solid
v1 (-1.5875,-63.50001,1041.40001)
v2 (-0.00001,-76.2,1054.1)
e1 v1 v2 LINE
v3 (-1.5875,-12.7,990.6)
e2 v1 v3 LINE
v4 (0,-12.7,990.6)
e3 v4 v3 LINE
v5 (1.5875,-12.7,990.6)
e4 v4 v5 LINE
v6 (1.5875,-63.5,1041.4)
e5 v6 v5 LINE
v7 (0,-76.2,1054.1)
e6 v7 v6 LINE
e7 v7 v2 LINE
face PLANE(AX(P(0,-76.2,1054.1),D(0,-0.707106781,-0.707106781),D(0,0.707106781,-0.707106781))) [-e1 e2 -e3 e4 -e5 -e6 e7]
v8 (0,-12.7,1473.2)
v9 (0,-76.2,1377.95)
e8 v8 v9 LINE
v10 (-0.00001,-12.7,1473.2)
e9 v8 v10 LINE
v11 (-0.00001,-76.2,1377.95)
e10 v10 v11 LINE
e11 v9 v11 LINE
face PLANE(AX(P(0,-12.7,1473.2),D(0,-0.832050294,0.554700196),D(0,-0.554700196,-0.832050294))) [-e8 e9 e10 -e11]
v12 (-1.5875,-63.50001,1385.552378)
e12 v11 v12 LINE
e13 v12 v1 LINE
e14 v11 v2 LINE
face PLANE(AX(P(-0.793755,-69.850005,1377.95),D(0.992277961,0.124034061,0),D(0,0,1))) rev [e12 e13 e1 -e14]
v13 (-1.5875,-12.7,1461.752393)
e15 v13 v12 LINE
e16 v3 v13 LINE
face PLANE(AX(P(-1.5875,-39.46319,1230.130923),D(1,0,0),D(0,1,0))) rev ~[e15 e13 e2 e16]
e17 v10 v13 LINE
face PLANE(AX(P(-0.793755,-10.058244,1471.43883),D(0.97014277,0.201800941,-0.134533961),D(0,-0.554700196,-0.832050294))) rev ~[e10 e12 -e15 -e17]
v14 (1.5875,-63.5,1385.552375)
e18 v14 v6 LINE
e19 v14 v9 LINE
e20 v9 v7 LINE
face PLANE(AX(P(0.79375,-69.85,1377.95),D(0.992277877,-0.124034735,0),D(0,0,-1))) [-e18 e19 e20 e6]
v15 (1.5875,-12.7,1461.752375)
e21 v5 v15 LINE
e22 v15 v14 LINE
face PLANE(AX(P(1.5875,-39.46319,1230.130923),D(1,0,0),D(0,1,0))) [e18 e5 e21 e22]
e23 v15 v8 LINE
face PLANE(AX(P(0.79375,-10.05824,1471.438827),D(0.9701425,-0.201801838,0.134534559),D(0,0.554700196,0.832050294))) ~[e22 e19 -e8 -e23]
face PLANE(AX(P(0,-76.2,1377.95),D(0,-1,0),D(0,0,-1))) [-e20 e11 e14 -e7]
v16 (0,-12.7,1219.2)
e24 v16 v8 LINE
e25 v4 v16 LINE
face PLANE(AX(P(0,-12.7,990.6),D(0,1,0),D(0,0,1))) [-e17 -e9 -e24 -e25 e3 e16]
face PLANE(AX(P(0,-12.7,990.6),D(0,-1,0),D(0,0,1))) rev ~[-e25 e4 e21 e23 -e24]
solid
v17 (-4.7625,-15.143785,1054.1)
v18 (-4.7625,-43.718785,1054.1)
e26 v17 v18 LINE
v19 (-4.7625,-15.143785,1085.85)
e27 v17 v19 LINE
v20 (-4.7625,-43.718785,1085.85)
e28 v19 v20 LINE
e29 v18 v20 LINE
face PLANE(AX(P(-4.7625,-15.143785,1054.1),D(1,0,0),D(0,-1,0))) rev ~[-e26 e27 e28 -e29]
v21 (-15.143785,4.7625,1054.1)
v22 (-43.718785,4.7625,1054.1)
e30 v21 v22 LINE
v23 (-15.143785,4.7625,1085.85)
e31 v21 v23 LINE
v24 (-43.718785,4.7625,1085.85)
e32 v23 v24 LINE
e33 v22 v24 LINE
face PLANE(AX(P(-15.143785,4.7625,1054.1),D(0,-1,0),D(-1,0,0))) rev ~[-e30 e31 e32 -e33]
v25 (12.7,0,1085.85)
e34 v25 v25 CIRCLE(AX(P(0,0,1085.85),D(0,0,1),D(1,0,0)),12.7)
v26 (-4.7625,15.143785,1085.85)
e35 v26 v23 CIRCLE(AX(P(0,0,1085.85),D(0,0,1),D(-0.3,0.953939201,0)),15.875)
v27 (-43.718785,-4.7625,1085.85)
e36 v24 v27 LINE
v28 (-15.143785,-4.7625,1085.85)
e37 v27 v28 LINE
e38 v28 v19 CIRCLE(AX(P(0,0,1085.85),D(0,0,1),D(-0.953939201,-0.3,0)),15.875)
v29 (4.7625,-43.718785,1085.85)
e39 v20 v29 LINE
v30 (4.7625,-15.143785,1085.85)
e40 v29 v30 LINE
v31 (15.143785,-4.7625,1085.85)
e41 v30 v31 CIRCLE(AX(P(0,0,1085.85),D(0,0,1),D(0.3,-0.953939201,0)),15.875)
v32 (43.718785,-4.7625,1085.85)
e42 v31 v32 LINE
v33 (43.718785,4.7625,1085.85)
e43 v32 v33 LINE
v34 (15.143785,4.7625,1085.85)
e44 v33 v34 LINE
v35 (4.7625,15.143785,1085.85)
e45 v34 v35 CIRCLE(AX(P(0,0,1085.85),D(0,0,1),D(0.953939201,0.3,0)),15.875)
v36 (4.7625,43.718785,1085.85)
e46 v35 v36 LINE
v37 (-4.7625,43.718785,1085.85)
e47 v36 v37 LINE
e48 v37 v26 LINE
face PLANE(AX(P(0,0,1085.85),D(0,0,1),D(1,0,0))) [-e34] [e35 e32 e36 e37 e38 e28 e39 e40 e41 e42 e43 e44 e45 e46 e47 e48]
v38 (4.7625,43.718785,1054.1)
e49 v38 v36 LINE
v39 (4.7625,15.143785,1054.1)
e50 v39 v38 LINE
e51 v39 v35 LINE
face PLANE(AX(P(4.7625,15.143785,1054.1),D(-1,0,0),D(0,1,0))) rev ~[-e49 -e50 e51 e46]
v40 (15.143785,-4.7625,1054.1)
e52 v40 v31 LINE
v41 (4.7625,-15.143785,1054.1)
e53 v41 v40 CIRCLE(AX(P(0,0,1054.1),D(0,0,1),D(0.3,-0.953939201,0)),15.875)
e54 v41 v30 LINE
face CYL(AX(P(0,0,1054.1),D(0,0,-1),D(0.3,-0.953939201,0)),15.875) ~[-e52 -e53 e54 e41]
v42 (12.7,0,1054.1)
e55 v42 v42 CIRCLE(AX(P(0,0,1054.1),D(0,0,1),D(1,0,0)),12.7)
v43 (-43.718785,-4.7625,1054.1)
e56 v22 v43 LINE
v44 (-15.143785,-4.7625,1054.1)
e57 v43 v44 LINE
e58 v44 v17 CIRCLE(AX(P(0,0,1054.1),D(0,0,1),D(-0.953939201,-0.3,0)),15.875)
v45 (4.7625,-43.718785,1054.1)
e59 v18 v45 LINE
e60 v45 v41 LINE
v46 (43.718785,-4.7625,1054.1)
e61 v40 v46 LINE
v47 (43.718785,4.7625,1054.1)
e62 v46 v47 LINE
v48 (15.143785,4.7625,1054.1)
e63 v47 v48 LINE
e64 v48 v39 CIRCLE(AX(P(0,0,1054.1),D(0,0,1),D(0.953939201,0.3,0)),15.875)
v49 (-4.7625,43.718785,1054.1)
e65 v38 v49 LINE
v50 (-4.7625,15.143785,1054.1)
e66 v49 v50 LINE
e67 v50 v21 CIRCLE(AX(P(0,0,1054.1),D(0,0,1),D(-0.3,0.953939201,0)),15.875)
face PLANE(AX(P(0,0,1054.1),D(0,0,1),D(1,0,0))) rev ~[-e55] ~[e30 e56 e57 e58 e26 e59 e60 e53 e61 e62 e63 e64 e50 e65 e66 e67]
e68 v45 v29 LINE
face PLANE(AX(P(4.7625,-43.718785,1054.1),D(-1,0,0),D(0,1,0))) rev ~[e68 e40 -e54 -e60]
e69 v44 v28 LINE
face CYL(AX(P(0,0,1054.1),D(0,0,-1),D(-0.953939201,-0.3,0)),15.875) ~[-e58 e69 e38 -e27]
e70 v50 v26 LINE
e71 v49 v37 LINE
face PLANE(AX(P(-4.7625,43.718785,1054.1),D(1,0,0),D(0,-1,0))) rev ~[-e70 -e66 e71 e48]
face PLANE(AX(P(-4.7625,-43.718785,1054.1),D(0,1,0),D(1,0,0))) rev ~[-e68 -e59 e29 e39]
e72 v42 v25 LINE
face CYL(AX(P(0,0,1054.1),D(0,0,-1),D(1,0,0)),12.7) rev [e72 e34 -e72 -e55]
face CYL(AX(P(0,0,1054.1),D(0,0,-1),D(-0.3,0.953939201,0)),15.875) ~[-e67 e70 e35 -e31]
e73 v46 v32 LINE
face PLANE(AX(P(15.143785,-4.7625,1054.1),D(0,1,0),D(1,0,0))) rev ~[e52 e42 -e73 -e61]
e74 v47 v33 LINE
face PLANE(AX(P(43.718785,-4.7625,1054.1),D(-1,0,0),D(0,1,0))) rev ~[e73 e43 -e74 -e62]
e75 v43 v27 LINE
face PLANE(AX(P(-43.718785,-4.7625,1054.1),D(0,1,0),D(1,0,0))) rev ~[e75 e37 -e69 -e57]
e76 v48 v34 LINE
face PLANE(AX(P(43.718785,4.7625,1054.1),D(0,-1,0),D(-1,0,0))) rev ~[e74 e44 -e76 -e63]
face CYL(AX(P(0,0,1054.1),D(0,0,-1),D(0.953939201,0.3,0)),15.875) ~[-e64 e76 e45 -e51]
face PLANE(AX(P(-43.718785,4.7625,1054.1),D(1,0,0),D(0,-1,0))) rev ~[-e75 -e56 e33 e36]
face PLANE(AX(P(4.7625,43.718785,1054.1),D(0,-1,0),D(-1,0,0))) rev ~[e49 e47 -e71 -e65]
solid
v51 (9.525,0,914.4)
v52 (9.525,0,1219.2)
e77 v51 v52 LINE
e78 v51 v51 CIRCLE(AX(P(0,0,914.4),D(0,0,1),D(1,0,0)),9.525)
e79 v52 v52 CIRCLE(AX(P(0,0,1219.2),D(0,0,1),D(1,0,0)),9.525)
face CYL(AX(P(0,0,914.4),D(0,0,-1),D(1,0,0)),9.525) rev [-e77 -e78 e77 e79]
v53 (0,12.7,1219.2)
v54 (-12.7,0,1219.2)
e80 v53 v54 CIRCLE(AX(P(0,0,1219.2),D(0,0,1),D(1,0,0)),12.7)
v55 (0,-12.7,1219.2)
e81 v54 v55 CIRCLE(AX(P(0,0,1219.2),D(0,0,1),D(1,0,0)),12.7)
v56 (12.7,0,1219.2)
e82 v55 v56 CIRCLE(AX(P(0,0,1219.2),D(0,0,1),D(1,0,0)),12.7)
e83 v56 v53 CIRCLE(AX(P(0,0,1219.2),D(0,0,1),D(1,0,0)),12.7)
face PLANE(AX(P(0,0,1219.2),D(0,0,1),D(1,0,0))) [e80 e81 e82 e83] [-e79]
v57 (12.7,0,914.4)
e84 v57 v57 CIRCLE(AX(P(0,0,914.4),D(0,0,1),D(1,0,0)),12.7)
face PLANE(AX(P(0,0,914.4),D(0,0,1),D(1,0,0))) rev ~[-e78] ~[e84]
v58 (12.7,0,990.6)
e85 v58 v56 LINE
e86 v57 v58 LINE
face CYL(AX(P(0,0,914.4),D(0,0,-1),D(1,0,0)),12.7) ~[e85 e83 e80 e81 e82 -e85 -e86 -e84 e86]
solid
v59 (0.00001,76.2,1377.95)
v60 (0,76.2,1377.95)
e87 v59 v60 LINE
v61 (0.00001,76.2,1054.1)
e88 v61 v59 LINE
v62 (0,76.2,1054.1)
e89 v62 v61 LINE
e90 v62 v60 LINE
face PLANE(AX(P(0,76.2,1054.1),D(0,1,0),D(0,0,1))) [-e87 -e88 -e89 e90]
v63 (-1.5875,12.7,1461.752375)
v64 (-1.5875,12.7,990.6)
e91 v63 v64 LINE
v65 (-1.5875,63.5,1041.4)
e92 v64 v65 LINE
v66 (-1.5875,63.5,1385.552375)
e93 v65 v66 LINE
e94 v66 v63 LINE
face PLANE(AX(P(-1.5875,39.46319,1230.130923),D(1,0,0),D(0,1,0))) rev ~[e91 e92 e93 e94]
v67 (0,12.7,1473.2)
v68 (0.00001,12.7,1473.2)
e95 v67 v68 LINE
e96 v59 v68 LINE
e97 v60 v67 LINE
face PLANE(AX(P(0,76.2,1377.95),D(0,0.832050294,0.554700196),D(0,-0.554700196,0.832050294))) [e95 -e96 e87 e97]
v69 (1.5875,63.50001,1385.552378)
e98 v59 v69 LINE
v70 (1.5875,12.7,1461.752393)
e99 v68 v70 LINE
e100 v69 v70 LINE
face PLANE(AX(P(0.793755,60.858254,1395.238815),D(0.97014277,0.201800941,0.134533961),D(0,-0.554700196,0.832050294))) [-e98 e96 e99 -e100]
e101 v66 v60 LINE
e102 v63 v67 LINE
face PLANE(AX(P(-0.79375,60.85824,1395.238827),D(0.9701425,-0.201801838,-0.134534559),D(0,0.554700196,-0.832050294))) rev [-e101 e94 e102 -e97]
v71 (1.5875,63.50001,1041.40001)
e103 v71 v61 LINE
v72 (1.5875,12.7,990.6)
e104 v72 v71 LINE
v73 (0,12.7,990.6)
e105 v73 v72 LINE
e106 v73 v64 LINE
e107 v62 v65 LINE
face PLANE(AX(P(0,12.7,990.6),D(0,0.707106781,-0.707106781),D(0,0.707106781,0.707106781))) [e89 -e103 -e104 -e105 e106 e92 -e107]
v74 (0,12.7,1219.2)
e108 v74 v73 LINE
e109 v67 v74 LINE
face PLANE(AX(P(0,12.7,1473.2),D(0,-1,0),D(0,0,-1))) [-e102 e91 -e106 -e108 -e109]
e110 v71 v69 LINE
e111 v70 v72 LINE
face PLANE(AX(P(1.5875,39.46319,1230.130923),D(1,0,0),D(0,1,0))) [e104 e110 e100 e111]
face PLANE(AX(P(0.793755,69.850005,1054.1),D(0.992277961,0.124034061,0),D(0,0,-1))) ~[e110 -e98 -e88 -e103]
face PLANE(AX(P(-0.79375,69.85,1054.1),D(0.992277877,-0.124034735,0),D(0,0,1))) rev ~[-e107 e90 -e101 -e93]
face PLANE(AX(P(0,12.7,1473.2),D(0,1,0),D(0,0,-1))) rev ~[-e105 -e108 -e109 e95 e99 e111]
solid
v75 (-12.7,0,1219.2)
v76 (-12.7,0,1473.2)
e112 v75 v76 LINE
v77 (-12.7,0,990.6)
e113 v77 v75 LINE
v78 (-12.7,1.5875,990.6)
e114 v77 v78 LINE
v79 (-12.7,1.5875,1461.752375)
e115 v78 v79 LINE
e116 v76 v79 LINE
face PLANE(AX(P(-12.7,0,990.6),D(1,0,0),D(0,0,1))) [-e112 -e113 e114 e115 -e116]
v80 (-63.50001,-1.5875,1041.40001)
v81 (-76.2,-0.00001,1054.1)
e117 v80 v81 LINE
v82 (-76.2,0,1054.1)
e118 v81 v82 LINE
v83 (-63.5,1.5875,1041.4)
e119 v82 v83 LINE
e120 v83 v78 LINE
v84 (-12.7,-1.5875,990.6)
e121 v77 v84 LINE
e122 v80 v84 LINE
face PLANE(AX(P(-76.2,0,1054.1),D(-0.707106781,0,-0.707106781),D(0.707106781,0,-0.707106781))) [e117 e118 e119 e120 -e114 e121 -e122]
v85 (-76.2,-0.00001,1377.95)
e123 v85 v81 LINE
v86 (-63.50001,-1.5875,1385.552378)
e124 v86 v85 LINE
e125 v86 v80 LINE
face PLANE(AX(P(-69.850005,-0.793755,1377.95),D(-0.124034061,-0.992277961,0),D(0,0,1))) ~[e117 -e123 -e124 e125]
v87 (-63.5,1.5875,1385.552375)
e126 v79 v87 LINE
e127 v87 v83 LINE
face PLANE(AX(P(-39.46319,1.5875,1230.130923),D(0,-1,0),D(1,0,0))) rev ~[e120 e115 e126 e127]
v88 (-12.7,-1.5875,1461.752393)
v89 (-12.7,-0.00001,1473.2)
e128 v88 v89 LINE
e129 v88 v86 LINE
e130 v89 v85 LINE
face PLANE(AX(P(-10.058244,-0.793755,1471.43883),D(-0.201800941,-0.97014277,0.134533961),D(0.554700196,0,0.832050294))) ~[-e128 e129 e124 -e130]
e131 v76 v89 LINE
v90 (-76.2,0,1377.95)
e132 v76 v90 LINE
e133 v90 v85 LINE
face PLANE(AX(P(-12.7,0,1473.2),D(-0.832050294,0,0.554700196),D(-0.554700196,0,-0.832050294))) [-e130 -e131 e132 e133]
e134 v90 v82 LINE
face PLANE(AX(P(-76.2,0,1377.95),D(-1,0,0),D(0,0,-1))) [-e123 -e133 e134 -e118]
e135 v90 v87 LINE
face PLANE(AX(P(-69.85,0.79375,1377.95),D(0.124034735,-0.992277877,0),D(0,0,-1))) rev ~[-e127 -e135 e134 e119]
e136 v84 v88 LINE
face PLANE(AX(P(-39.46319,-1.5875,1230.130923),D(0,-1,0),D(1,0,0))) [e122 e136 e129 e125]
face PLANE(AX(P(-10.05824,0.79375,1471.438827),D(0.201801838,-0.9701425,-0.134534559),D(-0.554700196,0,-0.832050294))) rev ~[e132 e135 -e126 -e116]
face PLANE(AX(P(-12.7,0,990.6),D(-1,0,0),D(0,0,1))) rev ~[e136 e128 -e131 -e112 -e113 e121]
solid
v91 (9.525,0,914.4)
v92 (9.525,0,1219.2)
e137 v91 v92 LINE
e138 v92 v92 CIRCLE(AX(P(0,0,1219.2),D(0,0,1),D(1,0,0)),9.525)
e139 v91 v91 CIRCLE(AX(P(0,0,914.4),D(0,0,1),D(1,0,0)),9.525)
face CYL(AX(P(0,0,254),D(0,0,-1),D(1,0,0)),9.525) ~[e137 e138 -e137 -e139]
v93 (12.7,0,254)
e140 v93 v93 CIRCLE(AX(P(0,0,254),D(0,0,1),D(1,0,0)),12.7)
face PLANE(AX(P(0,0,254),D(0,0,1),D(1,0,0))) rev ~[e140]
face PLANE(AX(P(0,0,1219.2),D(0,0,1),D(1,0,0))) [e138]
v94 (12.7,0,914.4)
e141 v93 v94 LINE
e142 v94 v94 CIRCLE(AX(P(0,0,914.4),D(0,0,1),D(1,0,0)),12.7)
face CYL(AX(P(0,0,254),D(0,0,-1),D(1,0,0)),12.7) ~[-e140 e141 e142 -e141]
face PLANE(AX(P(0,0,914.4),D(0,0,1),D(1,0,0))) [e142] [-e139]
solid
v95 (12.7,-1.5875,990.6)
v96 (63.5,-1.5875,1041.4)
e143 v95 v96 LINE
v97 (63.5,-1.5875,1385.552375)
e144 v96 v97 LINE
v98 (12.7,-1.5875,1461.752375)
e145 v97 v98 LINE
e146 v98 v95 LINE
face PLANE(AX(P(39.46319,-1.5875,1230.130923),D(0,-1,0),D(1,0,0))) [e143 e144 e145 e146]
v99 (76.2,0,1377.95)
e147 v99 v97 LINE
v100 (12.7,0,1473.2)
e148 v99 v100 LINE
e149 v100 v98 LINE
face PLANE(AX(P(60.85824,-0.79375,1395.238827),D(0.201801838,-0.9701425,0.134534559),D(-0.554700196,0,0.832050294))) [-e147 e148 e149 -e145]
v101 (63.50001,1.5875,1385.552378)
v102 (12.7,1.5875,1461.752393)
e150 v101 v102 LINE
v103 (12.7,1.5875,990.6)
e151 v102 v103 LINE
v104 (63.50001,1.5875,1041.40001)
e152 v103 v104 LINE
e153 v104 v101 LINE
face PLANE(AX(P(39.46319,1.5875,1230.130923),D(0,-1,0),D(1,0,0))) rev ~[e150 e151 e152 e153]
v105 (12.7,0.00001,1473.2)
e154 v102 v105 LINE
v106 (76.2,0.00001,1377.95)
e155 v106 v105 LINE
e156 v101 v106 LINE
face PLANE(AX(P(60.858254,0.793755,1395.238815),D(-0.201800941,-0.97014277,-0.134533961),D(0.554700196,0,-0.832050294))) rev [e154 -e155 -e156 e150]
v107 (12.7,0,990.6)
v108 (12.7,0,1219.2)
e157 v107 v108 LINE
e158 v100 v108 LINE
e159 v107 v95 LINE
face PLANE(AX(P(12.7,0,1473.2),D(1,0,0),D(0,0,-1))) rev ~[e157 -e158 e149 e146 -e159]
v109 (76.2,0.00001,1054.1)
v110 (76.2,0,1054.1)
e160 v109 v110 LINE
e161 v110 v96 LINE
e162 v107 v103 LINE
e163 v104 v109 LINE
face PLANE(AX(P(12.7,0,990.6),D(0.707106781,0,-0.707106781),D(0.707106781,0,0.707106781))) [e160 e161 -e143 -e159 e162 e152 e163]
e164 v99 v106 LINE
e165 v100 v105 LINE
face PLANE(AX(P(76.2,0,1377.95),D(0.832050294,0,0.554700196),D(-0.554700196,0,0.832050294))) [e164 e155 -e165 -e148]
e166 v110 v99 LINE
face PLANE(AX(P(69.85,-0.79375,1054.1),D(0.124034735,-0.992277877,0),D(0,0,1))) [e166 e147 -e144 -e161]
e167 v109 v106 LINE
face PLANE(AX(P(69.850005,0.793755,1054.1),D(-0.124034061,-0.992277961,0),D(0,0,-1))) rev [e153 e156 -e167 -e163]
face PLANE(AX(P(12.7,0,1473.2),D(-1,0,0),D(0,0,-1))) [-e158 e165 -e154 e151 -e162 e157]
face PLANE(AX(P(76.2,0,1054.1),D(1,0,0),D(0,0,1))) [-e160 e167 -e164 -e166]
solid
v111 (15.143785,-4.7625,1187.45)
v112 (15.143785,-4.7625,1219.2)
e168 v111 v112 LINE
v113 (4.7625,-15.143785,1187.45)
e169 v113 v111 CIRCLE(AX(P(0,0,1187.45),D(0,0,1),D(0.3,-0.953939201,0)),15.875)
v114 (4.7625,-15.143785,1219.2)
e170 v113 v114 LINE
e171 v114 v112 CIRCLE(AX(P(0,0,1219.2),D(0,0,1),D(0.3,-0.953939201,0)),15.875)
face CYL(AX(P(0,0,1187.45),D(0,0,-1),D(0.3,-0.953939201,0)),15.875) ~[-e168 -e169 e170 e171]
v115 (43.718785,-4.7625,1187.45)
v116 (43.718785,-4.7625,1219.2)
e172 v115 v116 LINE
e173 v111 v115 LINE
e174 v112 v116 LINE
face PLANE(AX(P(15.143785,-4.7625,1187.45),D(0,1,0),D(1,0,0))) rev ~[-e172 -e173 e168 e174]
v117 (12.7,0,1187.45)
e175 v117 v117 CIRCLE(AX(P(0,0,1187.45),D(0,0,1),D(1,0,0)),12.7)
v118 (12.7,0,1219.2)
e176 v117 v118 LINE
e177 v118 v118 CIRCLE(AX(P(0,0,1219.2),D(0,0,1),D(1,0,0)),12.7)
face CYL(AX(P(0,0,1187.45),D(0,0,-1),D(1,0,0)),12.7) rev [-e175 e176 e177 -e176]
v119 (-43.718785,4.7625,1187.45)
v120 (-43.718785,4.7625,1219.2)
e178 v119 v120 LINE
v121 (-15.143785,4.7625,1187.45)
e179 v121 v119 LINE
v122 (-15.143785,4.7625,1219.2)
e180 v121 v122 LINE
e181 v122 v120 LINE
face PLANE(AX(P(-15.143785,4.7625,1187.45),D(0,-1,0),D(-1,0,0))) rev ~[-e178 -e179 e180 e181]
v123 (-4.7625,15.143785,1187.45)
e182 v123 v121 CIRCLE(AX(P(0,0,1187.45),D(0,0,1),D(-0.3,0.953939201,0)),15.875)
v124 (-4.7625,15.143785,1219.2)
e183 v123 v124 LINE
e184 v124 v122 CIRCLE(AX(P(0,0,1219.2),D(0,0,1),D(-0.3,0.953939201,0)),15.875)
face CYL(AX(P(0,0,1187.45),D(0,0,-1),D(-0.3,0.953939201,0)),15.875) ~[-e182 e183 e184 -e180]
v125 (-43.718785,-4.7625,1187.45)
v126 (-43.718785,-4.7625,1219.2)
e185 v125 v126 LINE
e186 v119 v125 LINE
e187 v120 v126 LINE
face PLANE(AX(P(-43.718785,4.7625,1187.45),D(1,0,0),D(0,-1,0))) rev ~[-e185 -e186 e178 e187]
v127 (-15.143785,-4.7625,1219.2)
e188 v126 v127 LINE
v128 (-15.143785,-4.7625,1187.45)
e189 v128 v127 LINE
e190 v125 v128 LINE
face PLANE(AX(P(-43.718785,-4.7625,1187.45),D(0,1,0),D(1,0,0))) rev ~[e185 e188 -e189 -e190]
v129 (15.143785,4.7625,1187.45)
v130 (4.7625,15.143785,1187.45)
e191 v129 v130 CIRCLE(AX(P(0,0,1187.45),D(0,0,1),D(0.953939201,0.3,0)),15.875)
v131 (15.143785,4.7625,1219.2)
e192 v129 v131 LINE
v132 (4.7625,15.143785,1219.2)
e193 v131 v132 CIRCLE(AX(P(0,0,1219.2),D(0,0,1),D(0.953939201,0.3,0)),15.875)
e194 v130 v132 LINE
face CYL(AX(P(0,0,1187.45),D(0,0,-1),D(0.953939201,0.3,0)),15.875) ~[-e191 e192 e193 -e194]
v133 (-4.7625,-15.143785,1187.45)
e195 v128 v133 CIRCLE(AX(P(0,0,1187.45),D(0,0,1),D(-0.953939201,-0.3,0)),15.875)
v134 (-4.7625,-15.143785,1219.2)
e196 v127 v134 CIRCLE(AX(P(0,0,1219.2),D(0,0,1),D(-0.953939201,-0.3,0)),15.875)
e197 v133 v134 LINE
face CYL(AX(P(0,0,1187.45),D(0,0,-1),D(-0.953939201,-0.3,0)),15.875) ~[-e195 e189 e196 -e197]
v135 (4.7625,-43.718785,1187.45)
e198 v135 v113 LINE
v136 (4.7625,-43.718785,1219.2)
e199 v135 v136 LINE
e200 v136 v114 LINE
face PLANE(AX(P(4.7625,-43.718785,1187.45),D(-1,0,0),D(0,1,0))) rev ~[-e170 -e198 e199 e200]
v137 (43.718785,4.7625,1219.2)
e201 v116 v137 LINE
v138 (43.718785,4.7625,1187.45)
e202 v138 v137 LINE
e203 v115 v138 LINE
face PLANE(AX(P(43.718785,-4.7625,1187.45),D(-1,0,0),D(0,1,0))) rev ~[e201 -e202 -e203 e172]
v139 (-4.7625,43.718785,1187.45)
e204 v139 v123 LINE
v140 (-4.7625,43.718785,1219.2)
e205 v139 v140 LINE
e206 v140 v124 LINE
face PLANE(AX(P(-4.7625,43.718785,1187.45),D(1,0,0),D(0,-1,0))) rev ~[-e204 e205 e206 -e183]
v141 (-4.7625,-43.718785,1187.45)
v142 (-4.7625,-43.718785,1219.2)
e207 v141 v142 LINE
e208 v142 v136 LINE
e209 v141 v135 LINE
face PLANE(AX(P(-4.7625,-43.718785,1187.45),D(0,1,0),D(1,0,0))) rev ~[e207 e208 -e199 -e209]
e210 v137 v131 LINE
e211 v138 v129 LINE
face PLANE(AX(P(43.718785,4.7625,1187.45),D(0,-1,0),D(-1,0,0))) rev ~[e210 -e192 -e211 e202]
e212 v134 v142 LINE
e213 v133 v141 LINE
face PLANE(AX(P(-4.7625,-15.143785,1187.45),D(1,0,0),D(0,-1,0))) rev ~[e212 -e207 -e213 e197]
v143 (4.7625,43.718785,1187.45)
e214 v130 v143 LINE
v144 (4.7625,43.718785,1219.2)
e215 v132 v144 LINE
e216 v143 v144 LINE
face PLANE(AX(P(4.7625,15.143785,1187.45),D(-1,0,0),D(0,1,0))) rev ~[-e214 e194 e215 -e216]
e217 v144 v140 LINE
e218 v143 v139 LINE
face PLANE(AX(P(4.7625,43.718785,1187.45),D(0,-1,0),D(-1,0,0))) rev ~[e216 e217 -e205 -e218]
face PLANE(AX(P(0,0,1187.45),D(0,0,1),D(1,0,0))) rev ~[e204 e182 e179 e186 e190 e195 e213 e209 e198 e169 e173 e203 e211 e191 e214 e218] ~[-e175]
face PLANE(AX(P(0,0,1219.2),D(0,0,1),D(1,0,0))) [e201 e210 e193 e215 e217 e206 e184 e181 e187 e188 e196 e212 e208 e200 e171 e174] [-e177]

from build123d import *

# Parameters (mm, degrees)
F1_START      = 254
F0_R          = 12.7
F0_R_2        = 9.525
F1_DEPTH      = 660.4
F2_START      = 254
F2_DEPTH      = 965.2
F3_START      = 914.4
F3_DEPTH      = 304.8
F5_DEPTH      = 1.5875
F5_DEPTH_BACK = 1.5875
F7_DEPTH      = 1.5875
F7_DEPTH_BACK = 1.5875
F9_START      = 1054.1
F8_R          = 12.7
F9_DEPTH      = 31.75
F10_START     = 1187.45
F10_DEPTH     = 31.75
F11_SIZE2     = 12.7
F11_SIZE      = 1.5875
F11_2_SIZE2   = 12.7
F11_2_SIZE    = 1.5875
F11_3_SIZE2   = 12.7
F11_3_SIZE    = 1.5875
F11_4_SIZE2   = 12.7
F11_4_SIZE    = 1.5875
F12_SIZE2     = 1.58749
F12_SIZE      = 12.69999
F12_2_SIZE2   = 1.58749
F12_2_SIZE    = 12.69999
F12_3_SIZE2   = 1.58749
F12_3_SIZE    = 12.69999
F12_4_SIZE2   = 1.58749
F12_4_SIZE    = 12.69999
F13_SIZE2     = 1.58749
F13_SIZE      = 6.34999
F13_2_SIZE2   = 1.5875
F13_2_SIZE    = 6.35
F13_3_SIZE2   = 1.58749
F13_3_SIZE    = 6.34999
F13_4_SIZE2   = 1.5875
F13_4_SIZE    = 6.35
F14_SIZE2     = 6.35
F14_SIZE      = 1.5875
F14_2_SIZE2   = 6.34999
F14_2_SIZE    = 1.58749
F14_3_SIZE2   = 6.35
F14_3_SIZE    = 1.5875
F14_4_SIZE2   = 6.34999
F14_4_SIZE    = 1.58749


# Not quite as in the source:
# - a fillet or chamfer is up to 0.001 mm smaller than in the source, because OpenCascade refuses the exact size


with BuildPart() as f1:
    # F0 (on Top) → F1 (new body)
    with BuildSketch(Plane.XY.offset(F1_START)):
        Circle(F0_R)
        Circle(F0_R_2, mode=Mode.SUBTRACT)
    extrude(amount=F1_DEPTH)

    # F0 (on Top) → F2 (join)
    with BuildSketch(Plane.XY.offset(F2_START)):
        Circle(F0_R_2)
    extrude(amount=F2_DEPTH)


with BuildPart() as f3:
    # F0 (on Top) → F3 (new body)
    with BuildSketch(Plane.XY.offset(F3_START)):
        Circle(F0_R)
        Circle(F0_R_2, mode=Mode.SUBTRACT)
    extrude(amount=F3_DEPTH)

    # F4 (on Front) → F5 (join, two sides)
    with BuildSketch(Plane.XZ) as f5_sk:
        Polygon((-12.7, 990.6), (-12.7, 1473.2), (-76.2, 1377.95), (-76.2, 1054.1), align=None)
        Polygon((76.2, 1377.95), (12.7, 1473.2), (12.7, 990.6), (76.2, 1054.1), align=None)
    extrude(amount=F5_DEPTH)
    extrude(f5_sk.sketch, amount=-F5_DEPTH_BACK)

    # F6 (on Right) → F7 (join, two sides)
    with BuildSketch(Plane.YZ) as f7_sk:
        Polygon((-76.2, 1054.1), (-12.7, 990.6), (-12.7, 1473.2), (-76.2, 1377.95), align=None)
        Polygon((12.7, 1473.2), (12.7, 990.6), (76.2, 1054.1), (76.2, 1377.95), align=None)
    extrude(amount=F7_DEPTH)
    extrude(f7_sk.sketch, amount=-F7_DEPTH_BACK)

    # F11
    f11_edges = [f3.edges().sort_by_distance(p)[0] for p in [
        (76.2, -1.5875, 1216.025),
    ]]
    f11_side = f3.faces().sort_by_distance((76.2, 0, 1216.025))[0]
    chamfer(f11_edges, length=F11_SIZE, length2=F11_SIZE2, reference=f11_side)

    # F11#2
    f11_2_edges = [f3.edges().sort_by_distance(p)[0] for p in [
        (1.5875, -76.2, 1216.025),
    ]]
    f11_2_side = f3.faces().sort_by_distance((0, -76.2, 1216.025))[0]
    chamfer(f11_2_edges, length=F11_2_SIZE, length2=F11_2_SIZE2, reference=f11_2_side)

    # F11#3
    f11_3_edges = [f3.edges().sort_by_distance(p)[0] for p in [
        (-76.2, 1.5875, 1216.025),
    ]]
    f11_3_side = f3.faces().sort_by_distance((-76.2, 0, 1216.025))[0]
    chamfer(f11_3_edges, length=F11_3_SIZE, length2=F11_3_SIZE2, reference=f11_3_side)

    # F11#4
    f11_4_edges = [f3.edges().sort_by_distance(p)[0] for p in [
        (-1.5875, 76.2, 1216.025),
    ]]
    f11_4_side = f3.faces().sort_by_distance((0, 76.2, 1216.025))[0]
    chamfer(f11_4_edges, length=F11_4_SIZE, length2=F11_4_SIZE2, reference=f11_4_side)

    # F12 (size 12.7 and 1.5875 in the source; OpenCascade refuses exactly that, so slightly less here)
    f12_edges = [f3.edges().sort_by_distance(p)[0] for p in [
        (-1.5875, -76.2, 1216.025),
    ]]
    f12_side = f3.faces().sort_by_distance((-1.5875, -42.366667, 1224.483333))[0]
    chamfer(f12_edges, length=F12_SIZE, length2=F12_SIZE2, reference=f12_side)

    # F12#2 (size 12.7 and 1.5875 in the source; OpenCascade refuses exactly that, so slightly less here)
    f12_2_edges = [f3.edges().sort_by_distance(p)[0] for p in [
        (-76.2, -1.5875, 1216.025),
    ]]
    f12_2_side = f3.faces().sort_by_distance((-42.366667, -1.5875, 1224.483333))[0]
    chamfer(f12_2_edges, length=F12_2_SIZE, length2=F12_2_SIZE2, reference=f12_2_side)

    # F12#3 (size 12.7 and 1.5875 in the source; OpenCascade refuses exactly that, so slightly less here)
    f12_3_edges = [f3.edges().sort_by_distance(p)[0] for p in [
        (1.5875, 76.2, 1216.025),
    ]]
    f12_3_side = f3.faces().sort_by_distance((1.5875, 42.366667, 1224.483333))[0]
    chamfer(f12_3_edges, length=F12_3_SIZE, length2=F12_3_SIZE2, reference=f12_3_side)

    # F12#4 (size 12.7 and 1.5875 in the source; OpenCascade refuses exactly that, so slightly less here)
    f12_4_edges = [f3.edges().sort_by_distance(p)[0] for p in [
        (76.2, 1.5875, 1216.025),
    ]]
    f12_4_side = f3.faces().sort_by_distance((42.366667, 1.5875, 1224.483333))[0]
    chamfer(f12_4_edges, length=F12_4_SIZE, length2=F12_4_SIZE2, reference=f12_4_side)

    # F13 (size 6.35 and 1.5875 in the source; OpenCascade refuses exactly that, so slightly less here)
    f13_edges = [f3.edges().sort_by_distance(p)[0] for p in [
        (38.100005, 1.5875, 1435.099993),
    ]]
    f13_side = f3.faces().sort_by_distance((36.817176, 1.5875, 1225.870706))[0]
    chamfer(f13_edges, length=F13_SIZE, length2=F13_SIZE2, reference=f13_side)

    # F13#2
    f13_2_edges = [f3.edges().sort_by_distance(p)[0] for p in [
        (-1.5875, 38.1, 1435.1),
    ]]
    f13_2_side = f3.faces().sort_by_distance((-1.5875, 36.817172, 1225.870707))[0]
    chamfer(f13_2_edges, length=F13_2_SIZE, length2=F13_2_SIZE2, reference=f13_2_side)

    # F13#3 (size 6.35 and 1.5875 in the source; OpenCascade refuses exactly that, so slightly less here)
    f13_3_edges = [f3.edges().sort_by_distance(p)[0] for p in [
        (-38.100005, -1.5875, 1435.099993),
    ]]
    f13_3_side = f3.faces().sort_by_distance((-36.817176, -1.5875, 1225.870706))[0]
    chamfer(f13_3_edges, length=F13_3_SIZE, length2=F13_3_SIZE2, reference=f13_3_side)

    # F13#4
    f13_4_edges = [f3.edges().sort_by_distance(p)[0] for p in [
        (1.5875, -38.1, 1435.1),
    ]]
    f13_4_side = f3.faces().sort_by_distance((1.5875, -36.817172, 1225.870707))[0]
    chamfer(f13_4_edges, length=F13_4_SIZE, length2=F13_4_SIZE2, reference=f13_4_side)

    # F14
    f14_edges = [f3.edges().sort_by_distance(p)[0] for p in [
        (38.1, -1.5875, 1435.1),
    ]]
    f14_side = f3.faces().sort_by_distance((41.392614, -0.764347, 1430.161079))[0]
    chamfer(f14_edges, length=F14_SIZE, length2=F14_SIZE2, reference=f14_side)

    # F14#2 (size 1.5875 and 6.35 in the source; OpenCascade refuses exactly that, so slightly less here)
    f14_2_edges = [f3.edges().sort_by_distance(p)[0] for p in [
        (-1.5875, -38.100005, 1435.099993),
    ]]
    f14_2_side = f3.faces().sort_by_distance((-0.764352, -41.392616, 1430.161076))[0]
    chamfer(f14_2_edges, length=F14_2_SIZE, length2=F14_2_SIZE2, reference=f14_2_side)

    # F14#3
    f14_3_edges = [f3.edges().sort_by_distance(p)[0] for p in [
        (-38.1, 1.5875, 1435.1),
    ]]
    f14_3_side = f3.faces().sort_by_distance((-41.392614, 0.764347, 1430.161079))[0]
    chamfer(f14_3_edges, length=F14_3_SIZE, length2=F14_3_SIZE2, reference=f14_3_side)

    # F14#4 (size 1.5875 and 6.35 in the source; OpenCascade refuses exactly that, so slightly less here)
    f14_4_edges = [f3.edges().sort_by_distance(p)[0] for p in [
        (1.5875, 38.100005, 1435.099993),
    ]]
    f14_4_side = f3.faces().sort_by_distance((0.764352, 41.392616, 1430.161076))[0]
    chamfer(f14_4_edges, length=F14_4_SIZE, length2=F14_4_SIZE2, reference=f14_4_side)


with BuildPart() as f9:
    # F8 (on Top) → F9 (new body)
    with BuildSketch(Plane.XY.offset(F9_START)):
        with BuildLine():
            Line((43.7187848225, 4.7625), (15.1437848225, 4.7625))
            ThreePointArc((15.1437848225, 4.7625), (11.2253201513, 11.2253201513), (4.7625, 15.1437848225))
            Line((4.7625, 15.1437848225), (4.7625, 43.7187848225))
            Line((4.7625, 43.7187848225), (-4.7625, 43.7187848225))
            Line((-4.7625, 43.7187848225), (-4.7625, 15.1437848225))
            ThreePointArc((-4.7625, 15.1437848225), (-11.2253201513, 11.2253201513), (-15.1437848225, 4.7625))
            Line((-15.1437848225, 4.7625), (-43.7187848225, 4.7625))
            Line((-43.7187848225, 4.7625), (-43.7187848225, -4.7625))
            Line((-43.7187848225, -4.7625), (-15.1437848225, -4.7625))
            ThreePointArc((-15.1437848225, -4.7625), (-11.2253201513, -11.2253201513), (-4.7625, -15.1437848225))
            Line((-4.7625, -15.1437848225), (-4.7625, -43.7187848225))
            Line((-4.7625, -43.7187848225), (4.7625, -43.7187848225))
            Line((4.7625, -43.7187848225), (4.7625, -15.1437848225))
            ThreePointArc((4.7625, -15.1437848225), (11.2253201513, -11.2253201513), (15.1437848225, -4.7625))
            Line((15.1437848225, -4.7625), (43.7187848225, -4.7625))
            Line((43.7187848225, -4.7625), (43.7187848225, 4.7625))
        make_face()
        Circle(F8_R, mode=Mode.SUBTRACT)
    extrude(amount=F9_DEPTH)


with BuildPart() as f10:
    # F8 (on Top) → F10 (new body)
    with BuildSketch(Plane.XY.offset(F10_START)):
        with BuildLine():
            Line((43.7187848225, 4.7625), (15.1437848225, 4.7625))
            ThreePointArc((15.1437848225, 4.7625), (11.2253201513, 11.2253201513), (4.7625, 15.1437848225))
            Line((4.7625, 15.1437848225), (4.7625, 43.7187848225))
            Line((4.7625, 43.7187848225), (-4.7625, 43.7187848225))
            Line((-4.7625, 43.7187848225), (-4.7625, 15.1437848225))
            ThreePointArc((-4.7625, 15.1437848225), (-11.2253201513, 11.2253201513), (-15.1437848225, 4.7625))
            Line((-15.1437848225, 4.7625), (-43.7187848225, 4.7625))
            Line((-43.7187848225, 4.7625), (-43.7187848225, -4.7625))
            Line((-43.7187848225, -4.7625), (-15.1437848225, -4.7625))
            ThreePointArc((-15.1437848225, -4.7625), (-11.2253201513, -11.2253201513), (-4.7625, -15.1437848225))
            Line((-4.7625, -15.1437848225), (-4.7625, -43.7187848225))
            Line((-4.7625, -43.7187848225), (4.7625, -43.7187848225))
            Line((4.7625, -43.7187848225), (4.7625, -15.1437848225))
            ThreePointArc((4.7625, -15.1437848225), (11.2253201513, -11.2253201513), (15.1437848225, -4.7625))
            Line((15.1437848225, -4.7625), (43.7187848225, -4.7625))
            Line((43.7187848225, -4.7625), (43.7187848225, 4.7625))
        make_face()
        Circle(F8_R, mode=Mode.SUBTRACT)
    extrude(amount=F10_DEPTH)


solid = Compound([f1.part, f3.part, f9.part, f10.part])
